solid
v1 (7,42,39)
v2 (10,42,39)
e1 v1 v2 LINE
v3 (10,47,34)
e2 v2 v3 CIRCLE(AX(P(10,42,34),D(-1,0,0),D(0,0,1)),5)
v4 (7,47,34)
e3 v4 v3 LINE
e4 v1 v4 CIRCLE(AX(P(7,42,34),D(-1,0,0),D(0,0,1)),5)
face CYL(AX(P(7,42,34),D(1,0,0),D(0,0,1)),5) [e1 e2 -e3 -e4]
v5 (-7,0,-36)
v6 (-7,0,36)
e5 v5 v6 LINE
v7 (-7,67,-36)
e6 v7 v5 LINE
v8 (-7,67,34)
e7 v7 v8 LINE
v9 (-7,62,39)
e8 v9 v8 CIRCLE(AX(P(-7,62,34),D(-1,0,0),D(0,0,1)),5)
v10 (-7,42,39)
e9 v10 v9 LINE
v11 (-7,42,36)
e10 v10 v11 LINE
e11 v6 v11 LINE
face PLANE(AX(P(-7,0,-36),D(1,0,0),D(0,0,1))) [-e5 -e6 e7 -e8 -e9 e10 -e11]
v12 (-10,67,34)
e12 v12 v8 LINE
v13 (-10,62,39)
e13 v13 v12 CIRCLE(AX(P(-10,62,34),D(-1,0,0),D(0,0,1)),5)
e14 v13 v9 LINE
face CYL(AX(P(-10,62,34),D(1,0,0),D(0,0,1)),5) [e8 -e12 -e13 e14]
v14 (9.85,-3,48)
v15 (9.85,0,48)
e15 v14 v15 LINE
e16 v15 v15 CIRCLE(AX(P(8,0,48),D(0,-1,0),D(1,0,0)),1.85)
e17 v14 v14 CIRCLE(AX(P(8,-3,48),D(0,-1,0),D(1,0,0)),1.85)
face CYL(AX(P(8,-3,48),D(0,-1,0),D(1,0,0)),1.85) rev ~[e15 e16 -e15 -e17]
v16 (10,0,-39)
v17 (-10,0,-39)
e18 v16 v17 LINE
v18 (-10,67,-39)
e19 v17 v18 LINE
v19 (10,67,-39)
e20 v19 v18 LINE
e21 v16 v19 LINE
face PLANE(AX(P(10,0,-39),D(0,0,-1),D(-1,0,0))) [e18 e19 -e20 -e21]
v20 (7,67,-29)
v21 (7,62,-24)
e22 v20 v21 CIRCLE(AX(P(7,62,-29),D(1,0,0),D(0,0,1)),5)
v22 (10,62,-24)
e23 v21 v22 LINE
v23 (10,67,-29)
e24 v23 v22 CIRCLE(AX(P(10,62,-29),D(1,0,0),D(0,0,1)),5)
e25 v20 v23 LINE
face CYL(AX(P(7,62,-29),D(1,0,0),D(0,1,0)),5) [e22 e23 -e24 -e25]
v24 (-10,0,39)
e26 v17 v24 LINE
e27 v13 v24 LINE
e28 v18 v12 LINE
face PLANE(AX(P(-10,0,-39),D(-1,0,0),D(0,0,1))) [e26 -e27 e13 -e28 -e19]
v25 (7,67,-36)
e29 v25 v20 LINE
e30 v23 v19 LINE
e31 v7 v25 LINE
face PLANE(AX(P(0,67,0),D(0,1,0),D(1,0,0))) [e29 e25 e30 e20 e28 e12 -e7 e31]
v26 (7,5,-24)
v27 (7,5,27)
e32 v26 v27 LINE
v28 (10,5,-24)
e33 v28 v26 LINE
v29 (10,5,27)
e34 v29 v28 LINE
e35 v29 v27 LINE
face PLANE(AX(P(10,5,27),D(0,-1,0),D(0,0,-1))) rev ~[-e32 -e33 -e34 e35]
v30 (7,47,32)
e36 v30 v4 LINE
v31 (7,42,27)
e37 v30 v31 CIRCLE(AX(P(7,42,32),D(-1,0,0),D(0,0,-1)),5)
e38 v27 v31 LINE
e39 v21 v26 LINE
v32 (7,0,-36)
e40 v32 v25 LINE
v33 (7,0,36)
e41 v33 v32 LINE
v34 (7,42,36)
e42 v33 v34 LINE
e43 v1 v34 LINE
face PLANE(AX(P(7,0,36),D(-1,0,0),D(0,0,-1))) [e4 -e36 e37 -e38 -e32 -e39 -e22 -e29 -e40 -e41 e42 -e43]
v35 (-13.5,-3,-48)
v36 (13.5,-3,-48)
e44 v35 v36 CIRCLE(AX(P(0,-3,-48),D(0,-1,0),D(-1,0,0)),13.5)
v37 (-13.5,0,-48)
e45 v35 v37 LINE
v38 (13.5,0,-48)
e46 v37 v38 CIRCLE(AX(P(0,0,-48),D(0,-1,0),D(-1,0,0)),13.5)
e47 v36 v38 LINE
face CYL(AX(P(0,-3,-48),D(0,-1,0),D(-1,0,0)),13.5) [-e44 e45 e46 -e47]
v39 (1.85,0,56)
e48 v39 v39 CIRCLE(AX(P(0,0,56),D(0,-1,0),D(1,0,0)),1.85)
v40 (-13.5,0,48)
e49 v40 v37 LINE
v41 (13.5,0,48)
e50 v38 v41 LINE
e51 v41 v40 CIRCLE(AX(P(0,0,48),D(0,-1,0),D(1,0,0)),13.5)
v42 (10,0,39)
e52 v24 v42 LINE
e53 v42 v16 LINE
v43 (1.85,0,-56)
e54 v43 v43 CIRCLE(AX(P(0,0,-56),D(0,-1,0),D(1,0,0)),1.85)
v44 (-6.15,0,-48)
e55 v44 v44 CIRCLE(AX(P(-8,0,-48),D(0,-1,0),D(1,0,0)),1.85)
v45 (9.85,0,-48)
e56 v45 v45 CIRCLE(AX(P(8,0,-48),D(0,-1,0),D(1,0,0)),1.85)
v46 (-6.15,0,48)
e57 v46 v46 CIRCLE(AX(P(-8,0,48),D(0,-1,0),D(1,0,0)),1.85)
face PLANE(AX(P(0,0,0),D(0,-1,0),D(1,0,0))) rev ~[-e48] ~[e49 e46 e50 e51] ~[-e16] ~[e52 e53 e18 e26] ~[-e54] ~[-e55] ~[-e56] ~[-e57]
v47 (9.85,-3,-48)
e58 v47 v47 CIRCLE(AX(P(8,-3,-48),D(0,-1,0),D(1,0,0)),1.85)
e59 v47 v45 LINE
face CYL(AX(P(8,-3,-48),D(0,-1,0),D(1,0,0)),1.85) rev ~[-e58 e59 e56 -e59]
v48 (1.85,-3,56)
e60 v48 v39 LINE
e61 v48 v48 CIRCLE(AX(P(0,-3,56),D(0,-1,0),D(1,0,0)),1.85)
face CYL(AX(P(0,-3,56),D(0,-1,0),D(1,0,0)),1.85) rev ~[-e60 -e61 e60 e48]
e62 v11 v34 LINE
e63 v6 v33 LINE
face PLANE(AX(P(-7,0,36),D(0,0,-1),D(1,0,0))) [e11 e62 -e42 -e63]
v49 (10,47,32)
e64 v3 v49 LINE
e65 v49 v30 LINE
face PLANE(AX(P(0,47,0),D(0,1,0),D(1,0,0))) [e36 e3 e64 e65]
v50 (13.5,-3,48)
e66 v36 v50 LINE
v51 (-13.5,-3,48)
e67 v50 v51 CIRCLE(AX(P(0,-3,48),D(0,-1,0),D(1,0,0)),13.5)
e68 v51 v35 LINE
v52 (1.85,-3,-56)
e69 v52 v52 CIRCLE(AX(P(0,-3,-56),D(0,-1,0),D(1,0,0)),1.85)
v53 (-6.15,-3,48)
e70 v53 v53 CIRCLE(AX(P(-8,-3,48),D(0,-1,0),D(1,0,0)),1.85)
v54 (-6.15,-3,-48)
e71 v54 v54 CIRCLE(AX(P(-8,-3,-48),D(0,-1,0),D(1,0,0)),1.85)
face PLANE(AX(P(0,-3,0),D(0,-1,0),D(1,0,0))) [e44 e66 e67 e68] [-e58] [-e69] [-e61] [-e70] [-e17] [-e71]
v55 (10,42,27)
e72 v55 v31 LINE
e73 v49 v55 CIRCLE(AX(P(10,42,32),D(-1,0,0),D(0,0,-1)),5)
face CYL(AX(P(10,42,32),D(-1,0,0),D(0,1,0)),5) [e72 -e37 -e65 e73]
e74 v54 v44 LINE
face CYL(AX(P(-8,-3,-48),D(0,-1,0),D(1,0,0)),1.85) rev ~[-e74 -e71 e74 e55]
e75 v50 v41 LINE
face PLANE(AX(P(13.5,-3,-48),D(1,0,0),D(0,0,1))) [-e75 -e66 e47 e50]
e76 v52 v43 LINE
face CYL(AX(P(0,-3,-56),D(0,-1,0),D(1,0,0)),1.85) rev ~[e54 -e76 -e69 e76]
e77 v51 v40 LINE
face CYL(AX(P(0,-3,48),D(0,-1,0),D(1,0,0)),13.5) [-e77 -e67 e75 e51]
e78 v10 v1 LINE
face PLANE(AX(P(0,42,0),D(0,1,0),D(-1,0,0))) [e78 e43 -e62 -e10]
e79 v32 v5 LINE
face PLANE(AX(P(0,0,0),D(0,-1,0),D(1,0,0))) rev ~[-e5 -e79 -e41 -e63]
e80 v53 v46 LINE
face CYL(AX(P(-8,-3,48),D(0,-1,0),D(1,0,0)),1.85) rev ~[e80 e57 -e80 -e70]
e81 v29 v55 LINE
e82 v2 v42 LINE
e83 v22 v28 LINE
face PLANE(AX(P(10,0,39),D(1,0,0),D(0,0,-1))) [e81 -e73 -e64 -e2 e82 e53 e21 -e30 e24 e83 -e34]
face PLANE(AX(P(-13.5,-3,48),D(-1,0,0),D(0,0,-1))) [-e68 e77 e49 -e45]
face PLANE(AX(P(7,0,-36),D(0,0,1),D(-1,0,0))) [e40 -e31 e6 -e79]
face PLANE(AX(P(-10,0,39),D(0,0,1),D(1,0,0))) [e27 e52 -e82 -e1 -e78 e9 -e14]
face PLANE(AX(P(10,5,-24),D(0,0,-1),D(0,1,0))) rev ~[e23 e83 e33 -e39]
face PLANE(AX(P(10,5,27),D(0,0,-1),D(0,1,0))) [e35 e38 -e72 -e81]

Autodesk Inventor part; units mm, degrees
ref_plane "YZ Plane" through (0, 0, 0) normal (1, 0, 0) x (0, 1, 0)
ref_plane "XZ Plane" through (0, 0, 0) normal (0, 1, 0) x (-1, 0, 0)
ref_plane "XY Plane" through (0, 0, 0) normal (0, 0, 1) x (1, 0, 0)
sketch "Sketch1" plane through (0, 0, 0) normal (0, 1, 0) x (-1, 0, 0)
  line L0 (-7, -36) -> (7, -36)
  line L1 (7, -36) -> (7, 36)
  line L2 (7, 36) -> (-7, 36)
  line L3 (-7, 36) -> (-7, -36)
  line L4 (-7, -36) -> (7, 36) construction
  line L5 (7, -36) -> (-7, 36) construction
  line L6 (-10, -39) -> (10, -39)
  line L7 (10, -39) -> (10, 39)
  line L8 (10, 39) -> (-10, 39)
  line L9 (-10, 39) -> (-10, -39)
  line L10 (-10, -39) -> (10, 39) construction
  line L11 (10, -39) -> (-10, 39) construction
  point P0 (0, 0)
  dimension "d0" = 14
  dimension "d1" = 72
  dimension "d2" = 20
  dimension "d3" = 78
extrude "Extrusion1" add sketch "Sketch1" along normal blind 42
sketch "Sketch2" plane through (10, 0, 39) normal (1, 0, 0) x (0, 0, -1)
  line L0 (78, 42) -> (0, 42) projected
  line L1 (12, 5) -> (63, 5)
  line L2 (12, 5) -> (12, 42)
  line L3 (63, 5) -> (63, 42)
  point P0 (39, 0)
  point P1 (39, 42)
  dimension "d6" = 78
  dimension "d7" = 51
extrude "Extrusion2" cut sketch "Sketch2" against normal blind 10
sketch "Sketch3" plane through (0, 42, 0) normal (0, 1, 0) x (1, 0, 0)
  line L0 (-10, 39) -> (-10, -39) projected
  line L1 (10, 39) -> (-10, 39) projected
  line L2 (10, 24) -> (10, 39) projected
  line L3 (-7, 36) -> (7, 36) projected
  line L4 (7, 36) -> (7, 24) projected
  line L5 (7, 24) -> (10, 24) projected
  line L6 (10, -39) -> (10, -27) projected
  line L7 (10, -27) -> (7, -27) projected
  line L8 (-7, 36) -> (-7, -36) projected
  line L9 (-7, -39) -> (-7, 36)
  line L10 (-10, -39) -> (-7, -39)
  line L11 (7, -39) -> (7, -27)
  line L12 (10, -39) -> (7, -39)
  point P0 (0, 0)
extrude "Extrusion3" add sketch "Sketch3" along normal blind 25
sketch "Sketch4" plane through (0, 0, 0) normal (0, -1, 0) x (1, 0, 0)
  line L0 (10, 39) -> (10, -39) projected
  line L1 (-10, 39) -> (10, 39) projected
  line L2 (-10, -39) -> (-10, 39) projected
  line L3 (10, -39) -> (-10, -39) projected
  point P0 (0, 0)
extrude "Extrusion4" add sketch "Sketch4" along normal blind 3
sketch "Sketch5" plane through (0, -3, 0) normal (0, -1, 0) x (1, 0, 0)
  circle A0 centre (-8, -48) radius 1.85
  circle A1 centre (0, -56) radius 1.85
  circle A2 centre (8, -48) radius 1.85 construction
  circle A3 centre (-8, 48) radius 1.85
  circle A4 centre (0, 56) radius 1.85
  circle A5 centre (8, 48) radius 1.85
  arc A6 (-13.5, -48) -> (13.5, -48) centre (0, -48) ccw
  circle A7 centre (8, -48) radius 1.85
  arc A8 (13.5, 48) -> (-13.5, 48) centre (0, 48) ccw
  line L0 (13.5, -48) -> (13.5, 48)
  line L1 (-13.5, 48) -> (-13.5, -48)
  point P0 (0, 0)
extrude "Extrusion5" add sketch "Sketch5" against normal blind 3
sketch "Sketch6" plane through (0, 67, 0) normal (0, 1, 0) x (1, 0, 0)
  line L0 (10, -39) -> (10, -27) projected
  line L1 (10, -27) -> (7, -27) projected
  line L2 (7, -27) -> (7, -39) projected
  line L3 (7, -39) -> (10, -39) projected
  point P0 (0, 0)
extrude "Extrusion6" cut sketch "Sketch6" against normal blind 20
fillet "Fillet1" radius 5 4 edges at (8.5, 47, 27) (8.5, 67, -24) (-8.5, 67, 39) (8.5, 47, 39)
properties part number "Phone Mount 2"
